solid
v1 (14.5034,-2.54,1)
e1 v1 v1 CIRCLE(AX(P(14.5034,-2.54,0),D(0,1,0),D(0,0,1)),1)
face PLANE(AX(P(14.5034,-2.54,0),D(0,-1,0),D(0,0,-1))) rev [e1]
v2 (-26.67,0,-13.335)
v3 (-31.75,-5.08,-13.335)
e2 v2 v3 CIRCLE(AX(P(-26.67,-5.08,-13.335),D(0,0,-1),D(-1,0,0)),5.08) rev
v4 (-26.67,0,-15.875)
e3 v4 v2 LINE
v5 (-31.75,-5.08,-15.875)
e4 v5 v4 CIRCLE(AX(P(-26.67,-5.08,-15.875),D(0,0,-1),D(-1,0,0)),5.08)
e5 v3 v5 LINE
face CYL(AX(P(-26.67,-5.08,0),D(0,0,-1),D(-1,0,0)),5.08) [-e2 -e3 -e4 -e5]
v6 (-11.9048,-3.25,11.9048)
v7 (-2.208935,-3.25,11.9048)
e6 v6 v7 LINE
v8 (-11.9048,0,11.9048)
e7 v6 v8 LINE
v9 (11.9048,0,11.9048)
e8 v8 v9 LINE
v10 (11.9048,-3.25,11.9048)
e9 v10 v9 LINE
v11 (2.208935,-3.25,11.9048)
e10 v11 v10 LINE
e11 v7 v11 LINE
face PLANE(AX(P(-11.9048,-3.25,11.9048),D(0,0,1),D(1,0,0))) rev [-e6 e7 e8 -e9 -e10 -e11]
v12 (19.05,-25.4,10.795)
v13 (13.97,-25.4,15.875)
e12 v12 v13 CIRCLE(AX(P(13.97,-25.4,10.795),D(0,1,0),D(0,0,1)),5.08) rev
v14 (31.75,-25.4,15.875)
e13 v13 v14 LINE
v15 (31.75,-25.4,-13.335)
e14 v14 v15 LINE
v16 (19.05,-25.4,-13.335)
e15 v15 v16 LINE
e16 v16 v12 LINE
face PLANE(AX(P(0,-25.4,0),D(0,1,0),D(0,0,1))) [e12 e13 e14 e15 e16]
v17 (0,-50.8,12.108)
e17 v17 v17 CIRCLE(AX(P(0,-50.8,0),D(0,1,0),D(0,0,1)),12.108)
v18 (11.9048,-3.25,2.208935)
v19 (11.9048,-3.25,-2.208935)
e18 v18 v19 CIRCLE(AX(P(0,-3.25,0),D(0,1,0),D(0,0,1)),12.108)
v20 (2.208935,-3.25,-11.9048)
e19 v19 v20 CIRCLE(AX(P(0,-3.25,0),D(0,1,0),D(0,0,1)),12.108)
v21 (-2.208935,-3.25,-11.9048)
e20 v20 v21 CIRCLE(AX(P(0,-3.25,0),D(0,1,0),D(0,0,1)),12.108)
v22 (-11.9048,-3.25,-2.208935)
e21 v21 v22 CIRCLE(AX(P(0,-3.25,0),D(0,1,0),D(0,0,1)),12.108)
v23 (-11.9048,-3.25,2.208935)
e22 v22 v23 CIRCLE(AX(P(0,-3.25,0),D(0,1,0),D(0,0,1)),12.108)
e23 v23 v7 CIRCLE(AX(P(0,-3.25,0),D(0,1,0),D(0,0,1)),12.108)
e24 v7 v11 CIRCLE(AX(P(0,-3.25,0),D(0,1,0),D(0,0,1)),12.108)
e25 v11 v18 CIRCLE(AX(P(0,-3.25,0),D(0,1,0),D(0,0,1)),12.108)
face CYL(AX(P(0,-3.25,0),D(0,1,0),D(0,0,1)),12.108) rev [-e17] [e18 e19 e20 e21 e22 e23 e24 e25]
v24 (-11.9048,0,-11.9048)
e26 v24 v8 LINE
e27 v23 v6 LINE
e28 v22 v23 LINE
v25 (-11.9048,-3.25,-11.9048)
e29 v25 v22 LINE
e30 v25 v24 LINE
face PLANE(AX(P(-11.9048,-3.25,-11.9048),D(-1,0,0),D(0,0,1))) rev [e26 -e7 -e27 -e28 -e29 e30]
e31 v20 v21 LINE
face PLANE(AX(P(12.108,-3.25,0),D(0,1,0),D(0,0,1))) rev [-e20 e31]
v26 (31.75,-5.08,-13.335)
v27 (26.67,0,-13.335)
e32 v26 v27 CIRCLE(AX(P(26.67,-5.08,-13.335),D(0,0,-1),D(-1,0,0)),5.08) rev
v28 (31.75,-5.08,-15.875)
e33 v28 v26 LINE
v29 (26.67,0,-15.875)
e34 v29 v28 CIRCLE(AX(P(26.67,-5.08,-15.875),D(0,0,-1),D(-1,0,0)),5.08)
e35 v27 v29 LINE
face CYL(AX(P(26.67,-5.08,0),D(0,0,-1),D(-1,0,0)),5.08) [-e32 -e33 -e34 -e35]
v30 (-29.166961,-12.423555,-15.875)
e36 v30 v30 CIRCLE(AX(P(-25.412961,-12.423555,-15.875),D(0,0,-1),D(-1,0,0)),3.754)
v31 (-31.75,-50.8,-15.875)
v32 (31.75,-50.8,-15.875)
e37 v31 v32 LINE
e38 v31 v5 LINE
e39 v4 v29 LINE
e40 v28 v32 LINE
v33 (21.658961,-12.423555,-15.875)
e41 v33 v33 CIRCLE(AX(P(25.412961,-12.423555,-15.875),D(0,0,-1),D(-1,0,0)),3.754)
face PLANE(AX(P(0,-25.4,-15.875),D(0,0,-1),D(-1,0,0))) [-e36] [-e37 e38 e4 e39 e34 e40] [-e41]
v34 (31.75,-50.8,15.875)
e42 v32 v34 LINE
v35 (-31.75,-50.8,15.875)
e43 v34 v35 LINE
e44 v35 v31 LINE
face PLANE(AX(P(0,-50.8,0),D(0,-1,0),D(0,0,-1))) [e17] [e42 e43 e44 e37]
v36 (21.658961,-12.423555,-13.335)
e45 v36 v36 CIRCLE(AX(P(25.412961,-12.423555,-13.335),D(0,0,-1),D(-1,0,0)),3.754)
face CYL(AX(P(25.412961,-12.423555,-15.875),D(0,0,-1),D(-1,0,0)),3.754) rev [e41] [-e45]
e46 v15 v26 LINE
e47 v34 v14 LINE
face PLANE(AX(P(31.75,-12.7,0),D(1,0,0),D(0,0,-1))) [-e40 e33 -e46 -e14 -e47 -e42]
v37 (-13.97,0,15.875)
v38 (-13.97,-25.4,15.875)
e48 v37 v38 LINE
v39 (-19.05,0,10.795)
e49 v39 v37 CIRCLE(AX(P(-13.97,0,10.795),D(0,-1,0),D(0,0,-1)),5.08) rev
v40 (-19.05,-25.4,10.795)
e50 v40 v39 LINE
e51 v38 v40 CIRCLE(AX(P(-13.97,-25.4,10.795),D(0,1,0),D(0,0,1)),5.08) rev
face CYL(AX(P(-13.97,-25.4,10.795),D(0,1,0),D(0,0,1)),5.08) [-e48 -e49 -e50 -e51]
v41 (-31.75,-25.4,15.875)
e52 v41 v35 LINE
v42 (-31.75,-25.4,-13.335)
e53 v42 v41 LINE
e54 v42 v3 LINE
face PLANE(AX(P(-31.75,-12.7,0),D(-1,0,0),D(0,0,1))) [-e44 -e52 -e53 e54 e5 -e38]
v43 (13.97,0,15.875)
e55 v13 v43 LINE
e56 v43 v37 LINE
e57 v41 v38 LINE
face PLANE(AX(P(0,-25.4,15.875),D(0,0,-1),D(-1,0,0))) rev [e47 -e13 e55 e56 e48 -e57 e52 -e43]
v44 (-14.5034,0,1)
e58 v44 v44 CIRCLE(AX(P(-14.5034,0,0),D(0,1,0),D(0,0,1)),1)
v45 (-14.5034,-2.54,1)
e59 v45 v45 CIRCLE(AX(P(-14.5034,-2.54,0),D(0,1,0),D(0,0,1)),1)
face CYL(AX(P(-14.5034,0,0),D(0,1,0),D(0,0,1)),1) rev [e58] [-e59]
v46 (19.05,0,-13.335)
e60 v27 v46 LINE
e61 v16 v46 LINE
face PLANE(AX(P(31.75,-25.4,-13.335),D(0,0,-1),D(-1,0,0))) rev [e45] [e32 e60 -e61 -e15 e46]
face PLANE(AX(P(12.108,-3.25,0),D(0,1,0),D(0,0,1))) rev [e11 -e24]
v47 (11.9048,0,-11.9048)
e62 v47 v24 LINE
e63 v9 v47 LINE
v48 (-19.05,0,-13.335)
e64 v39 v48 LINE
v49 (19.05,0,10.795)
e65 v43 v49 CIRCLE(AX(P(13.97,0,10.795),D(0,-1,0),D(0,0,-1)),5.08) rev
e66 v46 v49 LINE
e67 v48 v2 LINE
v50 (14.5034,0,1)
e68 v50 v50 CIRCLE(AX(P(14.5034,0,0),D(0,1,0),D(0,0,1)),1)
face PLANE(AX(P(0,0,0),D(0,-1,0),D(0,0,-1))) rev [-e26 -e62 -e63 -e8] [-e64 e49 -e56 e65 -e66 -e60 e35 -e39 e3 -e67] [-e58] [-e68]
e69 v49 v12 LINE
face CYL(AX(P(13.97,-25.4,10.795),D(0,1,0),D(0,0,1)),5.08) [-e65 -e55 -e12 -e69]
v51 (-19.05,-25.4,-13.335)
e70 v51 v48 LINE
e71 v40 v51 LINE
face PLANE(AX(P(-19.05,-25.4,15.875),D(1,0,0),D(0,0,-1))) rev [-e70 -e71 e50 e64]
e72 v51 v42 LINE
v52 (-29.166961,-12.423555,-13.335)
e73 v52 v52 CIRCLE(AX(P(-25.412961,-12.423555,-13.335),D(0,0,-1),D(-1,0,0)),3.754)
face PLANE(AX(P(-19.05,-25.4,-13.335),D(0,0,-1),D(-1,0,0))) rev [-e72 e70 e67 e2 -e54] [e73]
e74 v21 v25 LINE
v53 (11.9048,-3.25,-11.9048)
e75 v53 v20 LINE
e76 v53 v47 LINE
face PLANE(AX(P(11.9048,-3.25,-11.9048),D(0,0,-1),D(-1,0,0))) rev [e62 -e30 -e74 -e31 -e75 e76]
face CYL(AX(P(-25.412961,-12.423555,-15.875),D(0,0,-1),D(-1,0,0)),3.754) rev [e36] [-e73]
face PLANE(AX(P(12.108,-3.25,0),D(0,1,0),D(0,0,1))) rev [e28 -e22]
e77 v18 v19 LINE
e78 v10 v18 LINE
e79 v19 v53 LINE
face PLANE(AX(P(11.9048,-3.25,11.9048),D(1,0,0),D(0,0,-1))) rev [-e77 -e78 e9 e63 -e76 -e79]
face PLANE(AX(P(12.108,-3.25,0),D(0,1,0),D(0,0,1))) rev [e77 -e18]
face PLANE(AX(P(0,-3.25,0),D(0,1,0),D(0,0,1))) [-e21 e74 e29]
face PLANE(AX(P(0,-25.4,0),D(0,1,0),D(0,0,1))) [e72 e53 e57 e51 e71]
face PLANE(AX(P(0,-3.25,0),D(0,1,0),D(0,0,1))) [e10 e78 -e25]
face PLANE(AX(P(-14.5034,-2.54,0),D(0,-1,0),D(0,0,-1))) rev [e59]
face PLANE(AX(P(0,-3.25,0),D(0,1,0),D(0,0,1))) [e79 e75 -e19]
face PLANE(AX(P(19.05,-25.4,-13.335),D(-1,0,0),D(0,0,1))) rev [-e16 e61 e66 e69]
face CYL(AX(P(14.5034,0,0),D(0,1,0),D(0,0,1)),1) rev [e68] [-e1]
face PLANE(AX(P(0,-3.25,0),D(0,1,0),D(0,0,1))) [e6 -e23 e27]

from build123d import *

# Parameters (mm, degrees)
BOSS_EXTRUDE1_START          = -25.4
BOSS_EXTRUDE1_OUTLINE_W      = 63.5
BOSS_EXTRUDE1_OUTLINE_H      = 31.75
BOSS_EXTRUDE1_DEPTH          = 50.8
SKETCH2_W                    = 12.7
SKETCH2_H                    = 29.21
CUT_EXTRUDE1_DEPTH           = 25.4
SKETCH3_W                    = 12.7
SKETCH3_H                    = 29.21
CUT_EXTRUDE2_DEPTH           = 25.4
SKETCH4_W                    = 23.809600622
SKETCH4_H                    = 23.809600622
CUT_EXTRUDE3_DEPTH           = 3.25
SKETCH5_W                    = 12.108
SKETCH5_H                    = 47.55
F_2_0_2_DIAMETER_HOLE1_D     = 2
F_2_0_2_DIAMETER_HOLE1_DEPTH = 2.54
M7_CLEARANCE_HOLE1_D         = 7.508
M7_CLEARANCE_HOLE1_DEPTH     = 31.75
FILLET1_R                    = 5.08


with BuildPart() as part:
    # Boss-Extrude1: read off the stored shape, not the designer's step
    # Boss-Extrude1 outline → Boss-Extrude1 (new body)
    with BuildSketch(Plane.XZ.offset(25.4).offset(BOSS_EXTRUDE1_START)):
        Rectangle(BOSS_EXTRUDE1_OUTLINE_W, BOSS_EXTRUDE1_OUTLINE_H)
    extrude(amount=BOSS_EXTRUDE1_DEPTH)

    # Sketch2 → Cut-Extrude1 (cut)
    with BuildSketch(Plane(origin=(0, 0, 0), x_dir=(-1, 0, 0), z_dir=(0, 1, 0))):
        with Locations((-25.4, 1.27)):
            Rectangle(SKETCH2_W, SKETCH2_H)
    extrude(amount=-CUT_EXTRUDE1_DEPTH, mode=Mode.SUBTRACT)

    # Sketch3 → Cut-Extrude2 (cut)
    with BuildSketch(Plane(origin=(0, 0, 0), x_dir=(-1, 0, 0), z_dir=(0, 1, 0))):
        with Locations((25.4, 1.27)):
            Rectangle(SKETCH3_W, SKETCH3_H)
    extrude(amount=-CUT_EXTRUDE2_DEPTH, mode=Mode.SUBTRACT)

    # Sketch4 → Cut-Extrude3 (cut)
    with BuildSketch(Plane(origin=(0, 0, 0), x_dir=(-1, 0, 0), z_dir=(0, 1, 0))):
        Rectangle(SKETCH4_W, SKETCH4_H)
    extrude(amount=-CUT_EXTRUDE3_DEPTH, mode=Mode.SUBTRACT)

    # Sketch5 → M22 Clearance Hole1 (revolve, cut)
    with BuildSketch(Plane(origin=(0, -3.25, 0), x_dir=(0, 0, 1), z_dir=(1, 0, 0))):
        with Locations((6.054, 23.775)):
            Rectangle(SKETCH5_W, SKETCH5_H)
    revolve(axis=Axis((0, 3.1, 0), (0, -1, 0)), mode=Mode.SUBTRACT)

    # Ø2.0 (2) Diameter Hole1
    with Locations(Plane(origin=(0, 0, 0), x_dir=(1, 0, 0), z_dir=(0, 1, 0))):
        with Locations((14.5034, 0), (-14.5034, 0)):
            Hole(F_2_0_2_DIAMETER_HOLE1_D / 2, depth=F_2_0_2_DIAMETER_HOLE1_DEPTH)

    # M7 Clearance Hole1
    with Locations(Plane(origin=(0, 0, -15.875), x_dir=(-1, 0, 0), z_dir=(0, 0, -1))):
        with Locations((25.412960945, -12.423554609), (-25.412960945, -12.423554609)):
            Hole(M7_CLEARANCE_HOLE1_D / 2, depth=M7_CLEARANCE_HOLE1_DEPTH)

    # Fillet1
    fillet1_edges = [part.edges().sort_by_distance(p)[0] for p in [
        (19.05, -12.7, 15.875),
        (-19.05, -12.7, 15.875),
        (-31.75, 0, -14.605),
        (31.75, 0, -14.605),
    ]]
    fillet(fillet1_edges, radius=FILLET1_R)


solid = part.part
